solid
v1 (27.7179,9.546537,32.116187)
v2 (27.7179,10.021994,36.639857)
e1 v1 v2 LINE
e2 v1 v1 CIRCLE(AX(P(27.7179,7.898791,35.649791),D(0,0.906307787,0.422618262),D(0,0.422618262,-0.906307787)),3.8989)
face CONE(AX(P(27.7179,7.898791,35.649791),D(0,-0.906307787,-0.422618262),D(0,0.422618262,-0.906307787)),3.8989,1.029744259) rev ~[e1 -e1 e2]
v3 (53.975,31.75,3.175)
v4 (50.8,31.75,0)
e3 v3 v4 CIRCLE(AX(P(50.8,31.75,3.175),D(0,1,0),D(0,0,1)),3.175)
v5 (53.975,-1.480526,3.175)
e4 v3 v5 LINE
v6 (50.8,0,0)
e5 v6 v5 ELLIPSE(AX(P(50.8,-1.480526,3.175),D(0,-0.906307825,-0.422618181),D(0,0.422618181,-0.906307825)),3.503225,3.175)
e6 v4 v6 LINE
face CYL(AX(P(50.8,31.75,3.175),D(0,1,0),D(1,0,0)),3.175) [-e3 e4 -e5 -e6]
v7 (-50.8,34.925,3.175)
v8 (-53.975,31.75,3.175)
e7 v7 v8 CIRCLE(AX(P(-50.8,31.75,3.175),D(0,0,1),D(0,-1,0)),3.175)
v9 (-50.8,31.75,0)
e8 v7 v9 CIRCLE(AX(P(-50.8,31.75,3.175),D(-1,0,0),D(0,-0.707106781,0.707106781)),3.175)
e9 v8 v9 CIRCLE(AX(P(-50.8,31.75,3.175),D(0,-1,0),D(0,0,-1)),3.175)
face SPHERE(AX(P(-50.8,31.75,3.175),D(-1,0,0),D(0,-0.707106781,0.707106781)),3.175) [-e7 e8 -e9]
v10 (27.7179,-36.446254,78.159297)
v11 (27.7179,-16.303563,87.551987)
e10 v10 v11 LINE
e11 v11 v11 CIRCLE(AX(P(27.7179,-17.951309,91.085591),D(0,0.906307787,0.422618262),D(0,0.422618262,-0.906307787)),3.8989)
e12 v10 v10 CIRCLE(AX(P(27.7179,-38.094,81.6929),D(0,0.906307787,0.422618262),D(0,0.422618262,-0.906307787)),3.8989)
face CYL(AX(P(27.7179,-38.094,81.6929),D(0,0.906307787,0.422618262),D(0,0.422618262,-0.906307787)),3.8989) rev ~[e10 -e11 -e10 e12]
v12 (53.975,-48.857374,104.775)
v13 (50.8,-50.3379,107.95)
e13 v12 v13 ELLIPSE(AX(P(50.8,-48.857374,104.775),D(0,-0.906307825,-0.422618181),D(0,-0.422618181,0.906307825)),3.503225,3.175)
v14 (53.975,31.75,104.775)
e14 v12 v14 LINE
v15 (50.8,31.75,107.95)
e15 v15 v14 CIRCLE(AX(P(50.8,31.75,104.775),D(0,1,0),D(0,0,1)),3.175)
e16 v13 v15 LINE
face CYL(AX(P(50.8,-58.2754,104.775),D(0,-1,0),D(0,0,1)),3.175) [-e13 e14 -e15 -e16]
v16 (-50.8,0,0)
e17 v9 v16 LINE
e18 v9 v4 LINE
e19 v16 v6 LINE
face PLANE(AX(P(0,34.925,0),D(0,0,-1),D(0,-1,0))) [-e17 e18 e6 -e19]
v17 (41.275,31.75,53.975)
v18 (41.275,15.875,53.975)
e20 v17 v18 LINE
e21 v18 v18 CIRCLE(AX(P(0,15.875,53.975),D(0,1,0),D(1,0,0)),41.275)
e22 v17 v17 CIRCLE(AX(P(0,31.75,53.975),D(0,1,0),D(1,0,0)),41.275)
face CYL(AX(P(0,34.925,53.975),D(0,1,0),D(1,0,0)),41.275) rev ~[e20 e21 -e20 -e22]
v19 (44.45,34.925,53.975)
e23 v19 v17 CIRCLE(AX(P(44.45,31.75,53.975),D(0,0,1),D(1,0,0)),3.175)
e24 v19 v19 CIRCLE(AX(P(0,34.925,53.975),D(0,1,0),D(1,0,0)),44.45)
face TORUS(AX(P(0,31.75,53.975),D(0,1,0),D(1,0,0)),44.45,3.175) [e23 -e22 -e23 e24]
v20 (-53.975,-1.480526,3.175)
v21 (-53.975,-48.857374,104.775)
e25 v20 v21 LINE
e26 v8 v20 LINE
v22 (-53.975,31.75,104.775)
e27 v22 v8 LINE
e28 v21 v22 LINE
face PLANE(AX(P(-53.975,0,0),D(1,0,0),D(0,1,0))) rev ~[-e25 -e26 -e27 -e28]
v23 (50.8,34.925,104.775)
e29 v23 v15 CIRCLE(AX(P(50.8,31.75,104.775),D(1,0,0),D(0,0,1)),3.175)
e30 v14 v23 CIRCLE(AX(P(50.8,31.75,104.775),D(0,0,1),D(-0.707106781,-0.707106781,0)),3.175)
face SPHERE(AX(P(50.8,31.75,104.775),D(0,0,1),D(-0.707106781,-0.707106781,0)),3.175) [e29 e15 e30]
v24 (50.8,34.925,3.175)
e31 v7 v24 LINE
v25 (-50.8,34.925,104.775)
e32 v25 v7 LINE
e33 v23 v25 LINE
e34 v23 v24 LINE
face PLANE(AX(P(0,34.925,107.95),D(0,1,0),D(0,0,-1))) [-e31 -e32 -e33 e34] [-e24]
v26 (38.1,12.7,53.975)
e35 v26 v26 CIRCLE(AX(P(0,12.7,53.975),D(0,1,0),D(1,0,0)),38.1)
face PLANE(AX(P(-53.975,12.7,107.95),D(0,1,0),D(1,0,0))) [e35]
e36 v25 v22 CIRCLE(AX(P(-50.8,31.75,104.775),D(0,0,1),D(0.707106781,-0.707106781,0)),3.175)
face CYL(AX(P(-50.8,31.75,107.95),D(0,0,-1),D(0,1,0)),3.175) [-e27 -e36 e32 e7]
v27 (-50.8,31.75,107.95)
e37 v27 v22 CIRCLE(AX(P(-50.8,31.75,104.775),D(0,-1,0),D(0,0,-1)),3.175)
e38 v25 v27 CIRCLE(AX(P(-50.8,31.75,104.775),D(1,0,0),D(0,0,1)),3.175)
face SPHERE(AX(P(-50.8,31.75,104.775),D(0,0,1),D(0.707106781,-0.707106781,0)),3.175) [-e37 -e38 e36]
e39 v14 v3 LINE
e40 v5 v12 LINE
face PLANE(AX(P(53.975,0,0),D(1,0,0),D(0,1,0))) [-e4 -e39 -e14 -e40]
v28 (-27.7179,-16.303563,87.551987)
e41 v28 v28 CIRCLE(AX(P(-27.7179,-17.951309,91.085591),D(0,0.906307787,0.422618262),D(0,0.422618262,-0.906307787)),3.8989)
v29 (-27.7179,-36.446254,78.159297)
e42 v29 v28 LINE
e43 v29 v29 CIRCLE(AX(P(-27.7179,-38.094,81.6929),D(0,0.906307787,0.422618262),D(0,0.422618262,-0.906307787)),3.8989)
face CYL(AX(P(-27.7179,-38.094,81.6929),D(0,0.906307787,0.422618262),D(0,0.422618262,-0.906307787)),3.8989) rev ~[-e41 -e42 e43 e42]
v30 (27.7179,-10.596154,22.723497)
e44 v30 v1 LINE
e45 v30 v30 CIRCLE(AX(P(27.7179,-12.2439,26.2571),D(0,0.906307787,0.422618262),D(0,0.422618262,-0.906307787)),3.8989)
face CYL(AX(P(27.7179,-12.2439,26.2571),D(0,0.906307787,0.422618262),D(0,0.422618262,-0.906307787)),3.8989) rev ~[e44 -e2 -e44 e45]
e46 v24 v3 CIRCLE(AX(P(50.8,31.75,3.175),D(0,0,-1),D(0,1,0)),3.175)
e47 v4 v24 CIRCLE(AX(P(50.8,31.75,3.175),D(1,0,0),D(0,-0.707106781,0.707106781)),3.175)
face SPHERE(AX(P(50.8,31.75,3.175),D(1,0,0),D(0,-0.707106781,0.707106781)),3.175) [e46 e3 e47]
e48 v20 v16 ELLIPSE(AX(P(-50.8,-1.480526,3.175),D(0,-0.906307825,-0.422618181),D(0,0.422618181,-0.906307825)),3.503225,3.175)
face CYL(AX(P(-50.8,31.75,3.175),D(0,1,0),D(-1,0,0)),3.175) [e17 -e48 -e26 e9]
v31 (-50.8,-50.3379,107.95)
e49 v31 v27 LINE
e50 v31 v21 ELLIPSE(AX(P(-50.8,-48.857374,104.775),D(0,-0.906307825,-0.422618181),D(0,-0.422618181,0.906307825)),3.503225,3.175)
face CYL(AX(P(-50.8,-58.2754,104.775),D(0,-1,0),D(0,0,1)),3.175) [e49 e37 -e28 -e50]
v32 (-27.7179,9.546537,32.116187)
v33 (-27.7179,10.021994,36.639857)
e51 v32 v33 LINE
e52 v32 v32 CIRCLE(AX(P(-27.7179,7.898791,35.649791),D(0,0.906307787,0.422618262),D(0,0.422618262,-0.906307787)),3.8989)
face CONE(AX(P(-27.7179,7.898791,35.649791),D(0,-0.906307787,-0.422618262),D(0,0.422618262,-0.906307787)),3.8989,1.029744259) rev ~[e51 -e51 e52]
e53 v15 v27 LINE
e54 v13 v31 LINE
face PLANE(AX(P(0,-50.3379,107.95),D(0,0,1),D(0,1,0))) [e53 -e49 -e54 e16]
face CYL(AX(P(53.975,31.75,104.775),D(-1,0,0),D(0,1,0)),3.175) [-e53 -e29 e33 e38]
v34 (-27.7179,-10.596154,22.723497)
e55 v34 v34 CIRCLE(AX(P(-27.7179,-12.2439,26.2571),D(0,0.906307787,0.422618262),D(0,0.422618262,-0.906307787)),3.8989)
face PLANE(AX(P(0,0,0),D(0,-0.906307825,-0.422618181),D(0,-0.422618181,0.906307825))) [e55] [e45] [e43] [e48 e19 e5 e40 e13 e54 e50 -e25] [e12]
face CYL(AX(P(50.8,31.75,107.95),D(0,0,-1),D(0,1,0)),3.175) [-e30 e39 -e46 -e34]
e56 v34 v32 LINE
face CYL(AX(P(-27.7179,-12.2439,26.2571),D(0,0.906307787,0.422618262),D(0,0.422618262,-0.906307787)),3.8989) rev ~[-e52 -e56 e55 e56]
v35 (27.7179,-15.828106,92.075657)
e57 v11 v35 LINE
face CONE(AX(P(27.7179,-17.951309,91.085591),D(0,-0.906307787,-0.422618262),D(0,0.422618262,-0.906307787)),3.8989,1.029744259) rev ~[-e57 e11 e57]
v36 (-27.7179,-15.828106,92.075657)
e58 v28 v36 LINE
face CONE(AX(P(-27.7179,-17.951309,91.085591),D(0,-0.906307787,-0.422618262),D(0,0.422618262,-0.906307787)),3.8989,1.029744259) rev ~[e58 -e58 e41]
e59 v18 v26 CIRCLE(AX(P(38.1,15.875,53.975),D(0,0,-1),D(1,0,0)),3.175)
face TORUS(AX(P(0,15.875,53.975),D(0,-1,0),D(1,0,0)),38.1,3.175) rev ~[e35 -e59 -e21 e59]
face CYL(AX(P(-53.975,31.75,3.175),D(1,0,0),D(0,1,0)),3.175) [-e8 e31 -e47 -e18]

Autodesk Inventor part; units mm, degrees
ref_plane "YZ Plane" through (0, 0, 0) normal (1, 0, 0) x (0, 1, 0)
ref_plane "XZ Plane" through (0, 0, 0) normal (0, 1, 0) x (-1, 0, 0)
ref_plane "XY Plane" through (0, 0, 0) normal (0, 0, 1) x (1, 0, 0)
sketch "Sketch1" plane through (0, 0, 0) normal (1, 0, 0) x (0, 1, 0)
  line L0 (0, 0) -> (-50.3379, 107.95)
  line L1 (-50.3379, 107.95) -> (34.925, 107.95)
  line L2 (34.925, 107.95) -> (34.925, 0)
  line L3 (34.925, 0) -> (0, 0)
  line L4 (0, 0) -> (0, 107.95) construction
  dimension "tilt" = 25
  dimension "baseDepth" = 107.95
  dimension "holderHeight" = 34.925
extrude "Extrusion1" add sketch "Sketch1" along normal mid plane 107.95
sketch "Sketch2" plane through (-53.975, 34.925, 107.95) normal (0, 1, 0) x (1, 0, 0)
  line L0 (107.95, 0) -> (0, 0) construction
  line L1 (107.95, 0) -> (107.95, 107.95) construction
  line L2 (0, 0) -> (107.95, 107.95) construction
  line L3 (0, 107.95) -> (107.95, 107.95) construction
  line L4 (0, 107.95) -> (107.95, 0) construction
  circle A0 centre (53.975, 53.975) radius 41.275
  point P0 (53.975, 107.95)
  dimension "d5" = 82.55
extrude "Extrusion2" cut sketch "Sketch2" against normal blind 22.225
sketch "Sketch4" plane through (-53.975, 0, 0) normal (0, -0.9063078, -0.4226183) x (1, 0, 0)
  line L0 (107.95, 119.1096) -> (107.95, 0) construction
  line L1 (107.95, 119.1096) -> (0, 119.1096) construction
  line L2 (107.95, 0) -> (0, 119.1096) construction
  line L3 (0, 0) -> (107.95, 0) construction
  line L4 (0, 0) -> (107.95, 119.1096) construction
  circle A0 centre (53.975, 59.5548) radius 41.275 construction
  ellipse E0 centre (53.975, 43.5507) end of major axis (12.7, 43.5507) minor radius 37.4079 projected
  point P0 (53.975, 0)
  point P1 (81.6929, 90.1382)
  point P2 (81.6929, 28.9715)
  point P3 (26.2571, 28.9715)
  point P4 (26.2571, 90.1382)
  dimension "d14" = 82.55
hole "Hole2" at (27.7179, -38.094, 81.6929) at (27.7179, -12.2439, 26.2571) at (-27.7179, -12.2439, 26.2571) at (-27.7179, -38.094, 81.6929) direction (0, 0.9063078, 0.4226183) diameter 7.7978 depth 22.225 tip angle 118 thread size "3/8-16 UNC" class "2B" standard "ANSI Unified Screw Threads"
fillet "Fillet1" radius 3.175 2 edges at (-41.275, 34.925, 53.975) (-41.275, 12.7, 53.975)
fillet "Fillet2" radius 3.175 4 edges at (0, 34.925, 107.95) (-53.975, 34.925, 53.975) (0, 34.925, 0) (53.975, 34.925, 53.975)
fillet "Fillet3" radius 3.175 8 edges at (-53.0451, 33.9951, 107.0201) (-53.975, -9.294, 107.95) (53.0451, 33.9951, 107.0201) (53.975, -9.294, 107.95) (53.0451, 33.9951, 0.9299) (53.975, 15.875, 0) (-53.0451, 33.9951, 0.9299) (-53.975, 15.875, 0)
equation "\"d5\" = cupDiam"
equation "\"d6\" = cupDepth"
equation "\"d14\" = cupDiam"
equation "\"d27\" = threadHoleDepth"
equation "\"d29\" = filet"
equation "\"d30\" = filet"
equation "\"d31\" = filet"
equation "\"cupDiam\" = 82.55"
equation "\"cupDepth\" = 22.225"
equation "\"threadHoleDepth\" = 22.225"
equation "\"filet\" = 3.175"
properties part number "ChickenCupHolder"
